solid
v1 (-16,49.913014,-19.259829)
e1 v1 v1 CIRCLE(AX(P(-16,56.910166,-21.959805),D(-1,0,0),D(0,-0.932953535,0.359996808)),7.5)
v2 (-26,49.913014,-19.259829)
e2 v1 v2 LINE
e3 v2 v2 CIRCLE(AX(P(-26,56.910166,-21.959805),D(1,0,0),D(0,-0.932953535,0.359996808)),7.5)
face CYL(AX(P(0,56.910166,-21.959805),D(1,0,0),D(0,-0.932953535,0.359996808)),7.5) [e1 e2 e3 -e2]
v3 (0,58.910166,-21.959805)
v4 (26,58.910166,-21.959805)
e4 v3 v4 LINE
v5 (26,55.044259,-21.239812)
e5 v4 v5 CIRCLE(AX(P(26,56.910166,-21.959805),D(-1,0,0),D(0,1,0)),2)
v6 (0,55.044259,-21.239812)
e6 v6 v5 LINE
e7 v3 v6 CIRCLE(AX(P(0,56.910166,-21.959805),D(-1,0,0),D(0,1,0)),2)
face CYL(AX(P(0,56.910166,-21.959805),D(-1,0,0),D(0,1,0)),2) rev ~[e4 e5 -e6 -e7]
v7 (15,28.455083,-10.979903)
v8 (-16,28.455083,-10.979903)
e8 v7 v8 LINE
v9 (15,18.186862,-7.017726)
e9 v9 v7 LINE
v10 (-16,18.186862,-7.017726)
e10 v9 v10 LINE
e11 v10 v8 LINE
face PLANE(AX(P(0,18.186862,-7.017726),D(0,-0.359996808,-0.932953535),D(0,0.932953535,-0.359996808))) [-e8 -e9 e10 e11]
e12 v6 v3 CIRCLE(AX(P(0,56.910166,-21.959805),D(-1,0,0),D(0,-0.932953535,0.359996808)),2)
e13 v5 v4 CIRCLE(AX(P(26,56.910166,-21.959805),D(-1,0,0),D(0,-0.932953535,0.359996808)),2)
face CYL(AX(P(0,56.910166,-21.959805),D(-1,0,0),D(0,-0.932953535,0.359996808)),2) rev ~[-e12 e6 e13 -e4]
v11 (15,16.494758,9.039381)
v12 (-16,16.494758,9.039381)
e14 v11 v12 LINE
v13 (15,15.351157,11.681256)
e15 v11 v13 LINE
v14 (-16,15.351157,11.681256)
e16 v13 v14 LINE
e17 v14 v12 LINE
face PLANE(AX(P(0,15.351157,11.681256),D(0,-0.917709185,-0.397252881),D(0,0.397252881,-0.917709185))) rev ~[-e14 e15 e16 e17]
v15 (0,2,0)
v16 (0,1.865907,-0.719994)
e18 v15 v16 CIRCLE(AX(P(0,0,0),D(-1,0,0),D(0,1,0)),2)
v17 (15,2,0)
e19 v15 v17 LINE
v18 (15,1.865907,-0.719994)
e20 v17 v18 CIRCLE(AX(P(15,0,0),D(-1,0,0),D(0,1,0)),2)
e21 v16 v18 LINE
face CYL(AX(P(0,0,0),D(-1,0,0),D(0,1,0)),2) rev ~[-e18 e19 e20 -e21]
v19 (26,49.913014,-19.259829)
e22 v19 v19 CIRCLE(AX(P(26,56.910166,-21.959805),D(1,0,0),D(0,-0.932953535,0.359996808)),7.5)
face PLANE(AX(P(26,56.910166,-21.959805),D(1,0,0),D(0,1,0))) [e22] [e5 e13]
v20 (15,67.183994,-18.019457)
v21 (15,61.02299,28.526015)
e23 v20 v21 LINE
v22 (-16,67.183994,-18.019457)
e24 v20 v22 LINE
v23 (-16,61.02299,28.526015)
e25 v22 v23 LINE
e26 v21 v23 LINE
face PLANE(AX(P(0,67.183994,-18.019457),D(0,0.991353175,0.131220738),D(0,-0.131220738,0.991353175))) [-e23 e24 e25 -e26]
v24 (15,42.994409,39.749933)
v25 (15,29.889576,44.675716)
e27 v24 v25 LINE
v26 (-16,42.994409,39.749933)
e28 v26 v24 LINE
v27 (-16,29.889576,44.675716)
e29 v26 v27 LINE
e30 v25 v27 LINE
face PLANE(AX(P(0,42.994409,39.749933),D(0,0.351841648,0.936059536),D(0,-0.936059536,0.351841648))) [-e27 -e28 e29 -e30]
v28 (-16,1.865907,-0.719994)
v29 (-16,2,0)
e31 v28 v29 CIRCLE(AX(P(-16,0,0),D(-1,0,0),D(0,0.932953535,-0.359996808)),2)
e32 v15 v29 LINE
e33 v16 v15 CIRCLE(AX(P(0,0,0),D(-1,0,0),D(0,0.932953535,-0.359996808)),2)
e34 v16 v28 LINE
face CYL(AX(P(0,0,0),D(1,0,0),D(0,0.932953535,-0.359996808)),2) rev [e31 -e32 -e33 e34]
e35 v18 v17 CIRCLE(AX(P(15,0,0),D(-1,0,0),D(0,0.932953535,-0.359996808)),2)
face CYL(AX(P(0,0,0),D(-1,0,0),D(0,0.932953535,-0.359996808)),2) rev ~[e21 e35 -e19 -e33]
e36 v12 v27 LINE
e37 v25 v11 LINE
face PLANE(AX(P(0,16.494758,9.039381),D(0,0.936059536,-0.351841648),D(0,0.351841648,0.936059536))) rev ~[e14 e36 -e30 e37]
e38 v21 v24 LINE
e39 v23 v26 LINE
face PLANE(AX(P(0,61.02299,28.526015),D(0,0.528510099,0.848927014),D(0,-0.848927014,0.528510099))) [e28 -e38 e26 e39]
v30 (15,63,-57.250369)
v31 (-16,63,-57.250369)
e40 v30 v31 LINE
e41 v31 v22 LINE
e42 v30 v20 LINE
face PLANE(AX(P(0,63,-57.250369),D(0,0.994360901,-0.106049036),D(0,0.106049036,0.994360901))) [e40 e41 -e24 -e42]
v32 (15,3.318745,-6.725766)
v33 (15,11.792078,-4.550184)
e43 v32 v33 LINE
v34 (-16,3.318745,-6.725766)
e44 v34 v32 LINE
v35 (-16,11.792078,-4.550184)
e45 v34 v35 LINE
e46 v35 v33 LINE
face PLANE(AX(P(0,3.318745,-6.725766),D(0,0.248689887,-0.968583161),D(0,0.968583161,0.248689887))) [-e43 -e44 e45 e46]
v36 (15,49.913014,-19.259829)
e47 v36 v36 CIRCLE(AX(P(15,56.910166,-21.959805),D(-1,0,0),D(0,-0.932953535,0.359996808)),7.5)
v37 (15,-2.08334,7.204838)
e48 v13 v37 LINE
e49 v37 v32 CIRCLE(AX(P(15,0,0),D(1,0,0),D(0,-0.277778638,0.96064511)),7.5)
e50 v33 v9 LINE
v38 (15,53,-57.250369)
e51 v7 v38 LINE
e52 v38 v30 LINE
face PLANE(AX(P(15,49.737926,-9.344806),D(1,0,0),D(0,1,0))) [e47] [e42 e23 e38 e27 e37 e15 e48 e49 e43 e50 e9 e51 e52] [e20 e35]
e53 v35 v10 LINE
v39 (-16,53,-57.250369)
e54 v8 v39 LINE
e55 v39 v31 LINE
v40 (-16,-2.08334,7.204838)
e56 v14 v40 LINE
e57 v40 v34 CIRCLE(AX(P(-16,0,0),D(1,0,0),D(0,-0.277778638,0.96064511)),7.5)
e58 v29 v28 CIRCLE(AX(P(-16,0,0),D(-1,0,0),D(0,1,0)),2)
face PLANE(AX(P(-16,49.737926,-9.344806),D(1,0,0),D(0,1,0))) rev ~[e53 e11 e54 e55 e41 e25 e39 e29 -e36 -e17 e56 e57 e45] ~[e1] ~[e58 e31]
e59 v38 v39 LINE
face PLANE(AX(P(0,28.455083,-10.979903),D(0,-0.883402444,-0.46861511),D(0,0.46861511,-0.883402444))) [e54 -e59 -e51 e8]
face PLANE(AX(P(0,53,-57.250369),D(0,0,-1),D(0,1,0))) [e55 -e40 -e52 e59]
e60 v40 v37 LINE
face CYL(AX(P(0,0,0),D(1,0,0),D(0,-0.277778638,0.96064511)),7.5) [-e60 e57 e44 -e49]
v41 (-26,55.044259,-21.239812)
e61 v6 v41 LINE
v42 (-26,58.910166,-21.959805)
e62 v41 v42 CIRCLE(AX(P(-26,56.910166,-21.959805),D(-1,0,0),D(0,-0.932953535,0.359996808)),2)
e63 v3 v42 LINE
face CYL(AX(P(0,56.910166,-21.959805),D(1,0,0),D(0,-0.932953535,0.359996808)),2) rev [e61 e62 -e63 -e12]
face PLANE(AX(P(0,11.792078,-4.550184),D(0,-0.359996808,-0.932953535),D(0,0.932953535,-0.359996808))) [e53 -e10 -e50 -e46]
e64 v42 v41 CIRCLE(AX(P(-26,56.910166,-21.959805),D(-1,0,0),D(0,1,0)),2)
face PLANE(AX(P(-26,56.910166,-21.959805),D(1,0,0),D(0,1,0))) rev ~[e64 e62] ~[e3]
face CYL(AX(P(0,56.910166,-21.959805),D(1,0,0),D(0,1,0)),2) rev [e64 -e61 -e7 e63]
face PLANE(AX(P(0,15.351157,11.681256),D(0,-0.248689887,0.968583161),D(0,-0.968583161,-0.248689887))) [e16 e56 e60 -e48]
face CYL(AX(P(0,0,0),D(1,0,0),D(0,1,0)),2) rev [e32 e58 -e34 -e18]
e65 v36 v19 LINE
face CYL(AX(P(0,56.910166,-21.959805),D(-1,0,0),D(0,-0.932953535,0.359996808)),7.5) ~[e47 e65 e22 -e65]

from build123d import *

# Parameters (mm, degrees)
F3_DEPTH      = 15
F3_DEPTH_BACK = 16
F4_DEPTH      = 26
F4_DEPTH_BACK = 26
F6_DEPTH      = 25
F6_DEPTH_BACK = 25


# Not quite as in the source:
# - a feature names something its author has since deleted; it is built from what else it names


with BuildPart() as f3:
    # F0 (on Right) → F3 (new body, two sides)
    with BuildSketch(Plane.YZ) as f3_sk:
        Polygon((42.99440903, 39.7499332097), (24.4999610724, -9.4537481835), (28.4550828122, -10.9799026477), (53, -57.2503693402), (63, -57.2503693402), (67.1839944136, -18.0194567546), (61.0229901087, 28.5260152414), align=None)
        with BuildLine():
            ThreePointArc((64.4101656244, -21.9598052953), (55.5369643161, -29.3330215655), (49.9130141132, -19.2598292344))
            ThreePointArc((49.9130141132, -19.2598292344), (58.2833669326, -14.5865890251), (64.4101656244, -21.9598052953))
        make_face(mode=Mode.SUBTRACT)
        with BuildLine():
            Line((3.3187451802, -6.7257661592), (11.7920777761, -4.5501841217))
            Line((11.7920777761, -4.5501841217), (18.186862473, -7.0177261735))
            Line((18.186862473, -7.0177261735), (24.4999610724, -9.4537481835))
            Line((24.4999610724, -9.4537481835), (42.99440903, 39.7499332097))
            Line((42.99440903, 39.7499332097), (28.0174564582, 45.3793995842))
            Line((28.0174564582, 45.3793995842), (15.3511571156, 11.6812562976))
            Line((15.3511571156, 11.6812562976), (-2.0833397847, 7.2048383286))
            ThreePointArc((-2.0833397847, 7.2048383286), (-6.9926384128, -2.7116430495), (3.3187451802, -6.7257661592))
        make_face()
        with BuildLine():
            ThreePointArc((2, 0), (1.9661910054, -0.3661870155), (1.8659070697, -0.7199936162))
            ThreePointArc((1.8659070697, -0.7199936162), (-1.9661910054, 0.3661870155), (2, 0))
        make_face(mode=Mode.SUBTRACT)
    extrude(amount=F3_DEPTH)
    extrude(f3_sk.sketch, amount=-F3_DEPTH_BACK)

    # F0 (on Right) → F4 (join, two sides)
    with BuildSketch(Plane.YZ) as f4_sk:
        with BuildLine():
            ThreePointArc((64.4101656244, -21.9598052953), (58.2833669326, -14.5865890251), (49.9130141132, -19.2598292344))
            ThreePointArc((49.9130141132, -19.2598292344), (55.5369643161, -29.3330215655), (64.4101656244, -21.9598052953))
        make_face()
        with BuildLine():
            ThreePointArc((58.9101656244, -21.9598052953), (56.5439786088, -23.9259963007), (55.0442585547, -21.2398116791))
            ThreePointArc((55.0442585547, -21.2398116791), (57.2763526399, -19.9936142899), (58.9101656244, -21.9598052953))
        make_face(mode=Mode.SUBTRACT)
    extrude(amount=F4_DEPTH)
    extrude(f4_sk.sketch, amount=-F4_DEPTH_BACK)

    # F5 (on Right) → F6 (cut, two sides)
    with BuildSketch(Plane.YZ) as f6_sk:
        Polygon((16.4947576102, 9.0393807374), (29.8895755297, 44.6757162874), (28.0174564582, 45.3793995842), (15.3511571156, 11.6812562976), align=None)
    extrude(amount=-F6_DEPTH, mode=Mode.SUBTRACT)
    extrude(f6_sk.sketch, amount=F6_DEPTH_BACK, mode=Mode.SUBTRACT)


solid = f3.part
